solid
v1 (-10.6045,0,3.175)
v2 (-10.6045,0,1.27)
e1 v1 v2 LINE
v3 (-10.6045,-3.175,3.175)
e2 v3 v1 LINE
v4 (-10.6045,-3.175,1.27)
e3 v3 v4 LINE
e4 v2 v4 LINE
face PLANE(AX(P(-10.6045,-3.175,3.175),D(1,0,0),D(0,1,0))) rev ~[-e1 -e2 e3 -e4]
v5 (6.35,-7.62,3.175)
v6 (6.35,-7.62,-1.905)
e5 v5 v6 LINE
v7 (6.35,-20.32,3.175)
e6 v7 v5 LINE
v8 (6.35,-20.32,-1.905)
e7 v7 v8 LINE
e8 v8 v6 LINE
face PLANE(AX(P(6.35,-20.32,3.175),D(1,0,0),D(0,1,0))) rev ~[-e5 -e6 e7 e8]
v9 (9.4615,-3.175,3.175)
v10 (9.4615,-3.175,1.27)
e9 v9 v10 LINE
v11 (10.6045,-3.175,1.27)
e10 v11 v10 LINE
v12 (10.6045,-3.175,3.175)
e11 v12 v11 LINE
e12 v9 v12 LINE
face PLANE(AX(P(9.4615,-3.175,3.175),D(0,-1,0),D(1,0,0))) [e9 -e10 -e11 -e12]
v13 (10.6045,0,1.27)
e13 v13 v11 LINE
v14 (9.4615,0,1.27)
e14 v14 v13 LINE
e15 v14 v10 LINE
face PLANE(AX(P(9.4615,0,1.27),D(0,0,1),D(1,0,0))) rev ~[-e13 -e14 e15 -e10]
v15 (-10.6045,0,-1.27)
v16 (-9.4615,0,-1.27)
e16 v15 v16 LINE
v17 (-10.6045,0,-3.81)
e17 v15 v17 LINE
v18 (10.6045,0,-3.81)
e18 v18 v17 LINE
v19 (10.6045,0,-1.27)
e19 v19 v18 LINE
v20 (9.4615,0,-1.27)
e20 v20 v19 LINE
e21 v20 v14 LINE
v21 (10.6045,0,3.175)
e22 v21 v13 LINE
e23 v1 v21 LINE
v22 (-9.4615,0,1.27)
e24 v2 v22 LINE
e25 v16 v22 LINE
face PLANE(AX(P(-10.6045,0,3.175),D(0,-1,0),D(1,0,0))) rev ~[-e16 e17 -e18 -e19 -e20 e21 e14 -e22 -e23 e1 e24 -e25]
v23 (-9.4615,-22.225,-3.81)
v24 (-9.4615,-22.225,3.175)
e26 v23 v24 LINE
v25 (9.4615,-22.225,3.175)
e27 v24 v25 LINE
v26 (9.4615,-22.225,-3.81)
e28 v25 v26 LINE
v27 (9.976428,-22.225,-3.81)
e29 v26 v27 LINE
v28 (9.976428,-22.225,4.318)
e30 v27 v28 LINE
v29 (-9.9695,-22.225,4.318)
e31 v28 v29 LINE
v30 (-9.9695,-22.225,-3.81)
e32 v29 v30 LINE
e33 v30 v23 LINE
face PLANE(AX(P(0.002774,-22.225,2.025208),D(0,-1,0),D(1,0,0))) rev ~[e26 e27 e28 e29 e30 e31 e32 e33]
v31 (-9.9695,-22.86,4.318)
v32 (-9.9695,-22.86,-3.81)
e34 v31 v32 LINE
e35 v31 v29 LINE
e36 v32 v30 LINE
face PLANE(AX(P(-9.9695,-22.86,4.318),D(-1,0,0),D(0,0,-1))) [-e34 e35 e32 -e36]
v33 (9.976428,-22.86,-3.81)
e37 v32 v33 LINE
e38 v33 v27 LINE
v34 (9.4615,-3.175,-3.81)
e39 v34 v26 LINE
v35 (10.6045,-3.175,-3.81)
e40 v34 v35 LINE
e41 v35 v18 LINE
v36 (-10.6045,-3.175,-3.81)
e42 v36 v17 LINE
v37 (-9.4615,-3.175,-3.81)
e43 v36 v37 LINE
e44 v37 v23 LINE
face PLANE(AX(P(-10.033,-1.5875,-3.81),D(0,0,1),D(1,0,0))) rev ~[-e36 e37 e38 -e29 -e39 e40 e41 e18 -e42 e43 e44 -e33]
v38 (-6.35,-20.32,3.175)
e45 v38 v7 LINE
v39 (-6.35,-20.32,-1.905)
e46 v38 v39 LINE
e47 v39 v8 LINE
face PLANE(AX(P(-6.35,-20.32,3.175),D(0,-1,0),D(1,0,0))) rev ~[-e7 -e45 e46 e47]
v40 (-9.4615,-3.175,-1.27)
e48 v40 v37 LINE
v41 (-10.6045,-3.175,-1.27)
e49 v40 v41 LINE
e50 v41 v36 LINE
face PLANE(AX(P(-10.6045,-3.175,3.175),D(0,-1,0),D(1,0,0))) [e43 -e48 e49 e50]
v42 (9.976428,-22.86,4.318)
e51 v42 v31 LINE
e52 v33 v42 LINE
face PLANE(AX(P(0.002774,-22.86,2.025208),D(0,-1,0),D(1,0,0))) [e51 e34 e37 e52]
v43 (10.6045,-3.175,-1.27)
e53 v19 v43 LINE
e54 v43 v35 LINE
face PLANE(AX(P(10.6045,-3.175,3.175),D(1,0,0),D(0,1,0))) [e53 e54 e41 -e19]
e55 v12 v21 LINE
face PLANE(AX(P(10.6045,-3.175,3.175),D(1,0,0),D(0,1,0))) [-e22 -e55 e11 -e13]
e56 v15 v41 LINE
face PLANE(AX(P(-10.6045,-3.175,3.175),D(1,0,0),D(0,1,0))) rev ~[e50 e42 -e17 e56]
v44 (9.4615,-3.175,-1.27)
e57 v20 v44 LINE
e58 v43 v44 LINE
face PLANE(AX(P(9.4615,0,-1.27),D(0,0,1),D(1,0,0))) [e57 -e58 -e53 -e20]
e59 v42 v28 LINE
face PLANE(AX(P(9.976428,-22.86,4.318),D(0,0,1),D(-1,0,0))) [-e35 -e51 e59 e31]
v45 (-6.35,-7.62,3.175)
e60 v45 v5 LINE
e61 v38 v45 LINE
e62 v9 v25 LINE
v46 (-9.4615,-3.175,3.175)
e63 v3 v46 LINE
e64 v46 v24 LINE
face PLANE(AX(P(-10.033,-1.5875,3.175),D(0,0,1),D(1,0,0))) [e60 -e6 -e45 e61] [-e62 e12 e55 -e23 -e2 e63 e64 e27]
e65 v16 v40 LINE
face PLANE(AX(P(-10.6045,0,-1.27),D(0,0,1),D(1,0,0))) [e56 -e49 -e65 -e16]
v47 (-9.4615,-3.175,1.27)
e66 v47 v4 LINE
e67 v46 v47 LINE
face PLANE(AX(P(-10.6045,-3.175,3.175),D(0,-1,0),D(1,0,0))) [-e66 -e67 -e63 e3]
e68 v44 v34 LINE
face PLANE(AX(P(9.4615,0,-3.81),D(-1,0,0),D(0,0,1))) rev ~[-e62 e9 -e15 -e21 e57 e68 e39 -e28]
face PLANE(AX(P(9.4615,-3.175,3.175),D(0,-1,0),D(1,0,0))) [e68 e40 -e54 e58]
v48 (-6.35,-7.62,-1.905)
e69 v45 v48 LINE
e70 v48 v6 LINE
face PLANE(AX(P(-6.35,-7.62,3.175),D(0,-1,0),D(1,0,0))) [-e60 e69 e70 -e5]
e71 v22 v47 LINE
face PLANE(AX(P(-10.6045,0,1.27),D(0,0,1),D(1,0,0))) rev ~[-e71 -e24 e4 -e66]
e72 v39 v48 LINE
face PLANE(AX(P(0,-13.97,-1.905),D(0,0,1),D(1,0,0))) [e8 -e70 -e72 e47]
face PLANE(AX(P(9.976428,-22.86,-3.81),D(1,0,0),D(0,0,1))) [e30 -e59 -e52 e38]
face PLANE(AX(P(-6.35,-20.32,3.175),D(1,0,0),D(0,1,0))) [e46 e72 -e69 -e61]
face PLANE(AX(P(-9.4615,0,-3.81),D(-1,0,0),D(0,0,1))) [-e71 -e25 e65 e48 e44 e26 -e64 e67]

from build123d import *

# Parameters (mm, degrees)
F0_W     = 18.923
F0_H     = 6.985
F1_DEPTH = 22.86
F3_DEPTH = 0.635
F4_W     = 12.7
F4_H     = 12.7
F5_DEPTH = 5.08
F4_W_2   = 1.143
F4_H_2   = 3.175
F6_DEPTH = 6.985
F7_W     = 1.143
F7_H     = 2.54
F8_DEPTH = 12.7


# Not quite as in the source:
# - a feature names something its author has since deleted; it is built from what else it names


with BuildPart() as f1:
    # F0 (on Front) → F1 (new body)
    with BuildSketch(Plane.XZ):
        with Locations((0, -0.3175)):
            Rectangle(F0_W, F0_H)
    extrude(amount=F1_DEPTH)

    # F2 (on face) → F3 (join)
    with BuildSketch(Plane.XZ.offset(22.86)):
        Polygon((9.9764279214, 4.318), (-9.9695, 4.318), (-9.9695, -3.81), (-9.4615, -3.81), (-9.4615, 3.175), (9.4615, 3.175), (9.4615, -3.81), (9.9764279214, -3.81), align=None)
    extrude(amount=-F3_DEPTH)

    # F4 (on face) → F5 (cut)
    with BuildSketch(Plane.XY.offset(3.175)):
        with Locations((0, -13.97)):
            Rectangle(F4_W, F4_H)
    extrude(amount=-F5_DEPTH, mode=Mode.SUBTRACT)

    # F4 (on face) → F6 (join, through all)
    with BuildSketch(Plane.XY.offset(3.175)):
        with Locations((-10.033, -1.5875)):
            Rectangle(F4_W_2, F4_H_2)
        with Locations((10.033, -1.5875)):
            Rectangle(F4_W_2, F4_H_2)
    extrude(amount=-F6_DEPTH)

    # F7 (on face) → F8 (cut)
    with BuildSketch(Plane.XZ):
        with Locations((10.033, 0)):
            Rectangle(F7_W, F7_H)
        with Locations((-10.033, 0)):
            Rectangle(F7_W, F7_H)
    extrude(amount=F8_DEPTH, mode=Mode.SUBTRACT)


solid = f1.part
